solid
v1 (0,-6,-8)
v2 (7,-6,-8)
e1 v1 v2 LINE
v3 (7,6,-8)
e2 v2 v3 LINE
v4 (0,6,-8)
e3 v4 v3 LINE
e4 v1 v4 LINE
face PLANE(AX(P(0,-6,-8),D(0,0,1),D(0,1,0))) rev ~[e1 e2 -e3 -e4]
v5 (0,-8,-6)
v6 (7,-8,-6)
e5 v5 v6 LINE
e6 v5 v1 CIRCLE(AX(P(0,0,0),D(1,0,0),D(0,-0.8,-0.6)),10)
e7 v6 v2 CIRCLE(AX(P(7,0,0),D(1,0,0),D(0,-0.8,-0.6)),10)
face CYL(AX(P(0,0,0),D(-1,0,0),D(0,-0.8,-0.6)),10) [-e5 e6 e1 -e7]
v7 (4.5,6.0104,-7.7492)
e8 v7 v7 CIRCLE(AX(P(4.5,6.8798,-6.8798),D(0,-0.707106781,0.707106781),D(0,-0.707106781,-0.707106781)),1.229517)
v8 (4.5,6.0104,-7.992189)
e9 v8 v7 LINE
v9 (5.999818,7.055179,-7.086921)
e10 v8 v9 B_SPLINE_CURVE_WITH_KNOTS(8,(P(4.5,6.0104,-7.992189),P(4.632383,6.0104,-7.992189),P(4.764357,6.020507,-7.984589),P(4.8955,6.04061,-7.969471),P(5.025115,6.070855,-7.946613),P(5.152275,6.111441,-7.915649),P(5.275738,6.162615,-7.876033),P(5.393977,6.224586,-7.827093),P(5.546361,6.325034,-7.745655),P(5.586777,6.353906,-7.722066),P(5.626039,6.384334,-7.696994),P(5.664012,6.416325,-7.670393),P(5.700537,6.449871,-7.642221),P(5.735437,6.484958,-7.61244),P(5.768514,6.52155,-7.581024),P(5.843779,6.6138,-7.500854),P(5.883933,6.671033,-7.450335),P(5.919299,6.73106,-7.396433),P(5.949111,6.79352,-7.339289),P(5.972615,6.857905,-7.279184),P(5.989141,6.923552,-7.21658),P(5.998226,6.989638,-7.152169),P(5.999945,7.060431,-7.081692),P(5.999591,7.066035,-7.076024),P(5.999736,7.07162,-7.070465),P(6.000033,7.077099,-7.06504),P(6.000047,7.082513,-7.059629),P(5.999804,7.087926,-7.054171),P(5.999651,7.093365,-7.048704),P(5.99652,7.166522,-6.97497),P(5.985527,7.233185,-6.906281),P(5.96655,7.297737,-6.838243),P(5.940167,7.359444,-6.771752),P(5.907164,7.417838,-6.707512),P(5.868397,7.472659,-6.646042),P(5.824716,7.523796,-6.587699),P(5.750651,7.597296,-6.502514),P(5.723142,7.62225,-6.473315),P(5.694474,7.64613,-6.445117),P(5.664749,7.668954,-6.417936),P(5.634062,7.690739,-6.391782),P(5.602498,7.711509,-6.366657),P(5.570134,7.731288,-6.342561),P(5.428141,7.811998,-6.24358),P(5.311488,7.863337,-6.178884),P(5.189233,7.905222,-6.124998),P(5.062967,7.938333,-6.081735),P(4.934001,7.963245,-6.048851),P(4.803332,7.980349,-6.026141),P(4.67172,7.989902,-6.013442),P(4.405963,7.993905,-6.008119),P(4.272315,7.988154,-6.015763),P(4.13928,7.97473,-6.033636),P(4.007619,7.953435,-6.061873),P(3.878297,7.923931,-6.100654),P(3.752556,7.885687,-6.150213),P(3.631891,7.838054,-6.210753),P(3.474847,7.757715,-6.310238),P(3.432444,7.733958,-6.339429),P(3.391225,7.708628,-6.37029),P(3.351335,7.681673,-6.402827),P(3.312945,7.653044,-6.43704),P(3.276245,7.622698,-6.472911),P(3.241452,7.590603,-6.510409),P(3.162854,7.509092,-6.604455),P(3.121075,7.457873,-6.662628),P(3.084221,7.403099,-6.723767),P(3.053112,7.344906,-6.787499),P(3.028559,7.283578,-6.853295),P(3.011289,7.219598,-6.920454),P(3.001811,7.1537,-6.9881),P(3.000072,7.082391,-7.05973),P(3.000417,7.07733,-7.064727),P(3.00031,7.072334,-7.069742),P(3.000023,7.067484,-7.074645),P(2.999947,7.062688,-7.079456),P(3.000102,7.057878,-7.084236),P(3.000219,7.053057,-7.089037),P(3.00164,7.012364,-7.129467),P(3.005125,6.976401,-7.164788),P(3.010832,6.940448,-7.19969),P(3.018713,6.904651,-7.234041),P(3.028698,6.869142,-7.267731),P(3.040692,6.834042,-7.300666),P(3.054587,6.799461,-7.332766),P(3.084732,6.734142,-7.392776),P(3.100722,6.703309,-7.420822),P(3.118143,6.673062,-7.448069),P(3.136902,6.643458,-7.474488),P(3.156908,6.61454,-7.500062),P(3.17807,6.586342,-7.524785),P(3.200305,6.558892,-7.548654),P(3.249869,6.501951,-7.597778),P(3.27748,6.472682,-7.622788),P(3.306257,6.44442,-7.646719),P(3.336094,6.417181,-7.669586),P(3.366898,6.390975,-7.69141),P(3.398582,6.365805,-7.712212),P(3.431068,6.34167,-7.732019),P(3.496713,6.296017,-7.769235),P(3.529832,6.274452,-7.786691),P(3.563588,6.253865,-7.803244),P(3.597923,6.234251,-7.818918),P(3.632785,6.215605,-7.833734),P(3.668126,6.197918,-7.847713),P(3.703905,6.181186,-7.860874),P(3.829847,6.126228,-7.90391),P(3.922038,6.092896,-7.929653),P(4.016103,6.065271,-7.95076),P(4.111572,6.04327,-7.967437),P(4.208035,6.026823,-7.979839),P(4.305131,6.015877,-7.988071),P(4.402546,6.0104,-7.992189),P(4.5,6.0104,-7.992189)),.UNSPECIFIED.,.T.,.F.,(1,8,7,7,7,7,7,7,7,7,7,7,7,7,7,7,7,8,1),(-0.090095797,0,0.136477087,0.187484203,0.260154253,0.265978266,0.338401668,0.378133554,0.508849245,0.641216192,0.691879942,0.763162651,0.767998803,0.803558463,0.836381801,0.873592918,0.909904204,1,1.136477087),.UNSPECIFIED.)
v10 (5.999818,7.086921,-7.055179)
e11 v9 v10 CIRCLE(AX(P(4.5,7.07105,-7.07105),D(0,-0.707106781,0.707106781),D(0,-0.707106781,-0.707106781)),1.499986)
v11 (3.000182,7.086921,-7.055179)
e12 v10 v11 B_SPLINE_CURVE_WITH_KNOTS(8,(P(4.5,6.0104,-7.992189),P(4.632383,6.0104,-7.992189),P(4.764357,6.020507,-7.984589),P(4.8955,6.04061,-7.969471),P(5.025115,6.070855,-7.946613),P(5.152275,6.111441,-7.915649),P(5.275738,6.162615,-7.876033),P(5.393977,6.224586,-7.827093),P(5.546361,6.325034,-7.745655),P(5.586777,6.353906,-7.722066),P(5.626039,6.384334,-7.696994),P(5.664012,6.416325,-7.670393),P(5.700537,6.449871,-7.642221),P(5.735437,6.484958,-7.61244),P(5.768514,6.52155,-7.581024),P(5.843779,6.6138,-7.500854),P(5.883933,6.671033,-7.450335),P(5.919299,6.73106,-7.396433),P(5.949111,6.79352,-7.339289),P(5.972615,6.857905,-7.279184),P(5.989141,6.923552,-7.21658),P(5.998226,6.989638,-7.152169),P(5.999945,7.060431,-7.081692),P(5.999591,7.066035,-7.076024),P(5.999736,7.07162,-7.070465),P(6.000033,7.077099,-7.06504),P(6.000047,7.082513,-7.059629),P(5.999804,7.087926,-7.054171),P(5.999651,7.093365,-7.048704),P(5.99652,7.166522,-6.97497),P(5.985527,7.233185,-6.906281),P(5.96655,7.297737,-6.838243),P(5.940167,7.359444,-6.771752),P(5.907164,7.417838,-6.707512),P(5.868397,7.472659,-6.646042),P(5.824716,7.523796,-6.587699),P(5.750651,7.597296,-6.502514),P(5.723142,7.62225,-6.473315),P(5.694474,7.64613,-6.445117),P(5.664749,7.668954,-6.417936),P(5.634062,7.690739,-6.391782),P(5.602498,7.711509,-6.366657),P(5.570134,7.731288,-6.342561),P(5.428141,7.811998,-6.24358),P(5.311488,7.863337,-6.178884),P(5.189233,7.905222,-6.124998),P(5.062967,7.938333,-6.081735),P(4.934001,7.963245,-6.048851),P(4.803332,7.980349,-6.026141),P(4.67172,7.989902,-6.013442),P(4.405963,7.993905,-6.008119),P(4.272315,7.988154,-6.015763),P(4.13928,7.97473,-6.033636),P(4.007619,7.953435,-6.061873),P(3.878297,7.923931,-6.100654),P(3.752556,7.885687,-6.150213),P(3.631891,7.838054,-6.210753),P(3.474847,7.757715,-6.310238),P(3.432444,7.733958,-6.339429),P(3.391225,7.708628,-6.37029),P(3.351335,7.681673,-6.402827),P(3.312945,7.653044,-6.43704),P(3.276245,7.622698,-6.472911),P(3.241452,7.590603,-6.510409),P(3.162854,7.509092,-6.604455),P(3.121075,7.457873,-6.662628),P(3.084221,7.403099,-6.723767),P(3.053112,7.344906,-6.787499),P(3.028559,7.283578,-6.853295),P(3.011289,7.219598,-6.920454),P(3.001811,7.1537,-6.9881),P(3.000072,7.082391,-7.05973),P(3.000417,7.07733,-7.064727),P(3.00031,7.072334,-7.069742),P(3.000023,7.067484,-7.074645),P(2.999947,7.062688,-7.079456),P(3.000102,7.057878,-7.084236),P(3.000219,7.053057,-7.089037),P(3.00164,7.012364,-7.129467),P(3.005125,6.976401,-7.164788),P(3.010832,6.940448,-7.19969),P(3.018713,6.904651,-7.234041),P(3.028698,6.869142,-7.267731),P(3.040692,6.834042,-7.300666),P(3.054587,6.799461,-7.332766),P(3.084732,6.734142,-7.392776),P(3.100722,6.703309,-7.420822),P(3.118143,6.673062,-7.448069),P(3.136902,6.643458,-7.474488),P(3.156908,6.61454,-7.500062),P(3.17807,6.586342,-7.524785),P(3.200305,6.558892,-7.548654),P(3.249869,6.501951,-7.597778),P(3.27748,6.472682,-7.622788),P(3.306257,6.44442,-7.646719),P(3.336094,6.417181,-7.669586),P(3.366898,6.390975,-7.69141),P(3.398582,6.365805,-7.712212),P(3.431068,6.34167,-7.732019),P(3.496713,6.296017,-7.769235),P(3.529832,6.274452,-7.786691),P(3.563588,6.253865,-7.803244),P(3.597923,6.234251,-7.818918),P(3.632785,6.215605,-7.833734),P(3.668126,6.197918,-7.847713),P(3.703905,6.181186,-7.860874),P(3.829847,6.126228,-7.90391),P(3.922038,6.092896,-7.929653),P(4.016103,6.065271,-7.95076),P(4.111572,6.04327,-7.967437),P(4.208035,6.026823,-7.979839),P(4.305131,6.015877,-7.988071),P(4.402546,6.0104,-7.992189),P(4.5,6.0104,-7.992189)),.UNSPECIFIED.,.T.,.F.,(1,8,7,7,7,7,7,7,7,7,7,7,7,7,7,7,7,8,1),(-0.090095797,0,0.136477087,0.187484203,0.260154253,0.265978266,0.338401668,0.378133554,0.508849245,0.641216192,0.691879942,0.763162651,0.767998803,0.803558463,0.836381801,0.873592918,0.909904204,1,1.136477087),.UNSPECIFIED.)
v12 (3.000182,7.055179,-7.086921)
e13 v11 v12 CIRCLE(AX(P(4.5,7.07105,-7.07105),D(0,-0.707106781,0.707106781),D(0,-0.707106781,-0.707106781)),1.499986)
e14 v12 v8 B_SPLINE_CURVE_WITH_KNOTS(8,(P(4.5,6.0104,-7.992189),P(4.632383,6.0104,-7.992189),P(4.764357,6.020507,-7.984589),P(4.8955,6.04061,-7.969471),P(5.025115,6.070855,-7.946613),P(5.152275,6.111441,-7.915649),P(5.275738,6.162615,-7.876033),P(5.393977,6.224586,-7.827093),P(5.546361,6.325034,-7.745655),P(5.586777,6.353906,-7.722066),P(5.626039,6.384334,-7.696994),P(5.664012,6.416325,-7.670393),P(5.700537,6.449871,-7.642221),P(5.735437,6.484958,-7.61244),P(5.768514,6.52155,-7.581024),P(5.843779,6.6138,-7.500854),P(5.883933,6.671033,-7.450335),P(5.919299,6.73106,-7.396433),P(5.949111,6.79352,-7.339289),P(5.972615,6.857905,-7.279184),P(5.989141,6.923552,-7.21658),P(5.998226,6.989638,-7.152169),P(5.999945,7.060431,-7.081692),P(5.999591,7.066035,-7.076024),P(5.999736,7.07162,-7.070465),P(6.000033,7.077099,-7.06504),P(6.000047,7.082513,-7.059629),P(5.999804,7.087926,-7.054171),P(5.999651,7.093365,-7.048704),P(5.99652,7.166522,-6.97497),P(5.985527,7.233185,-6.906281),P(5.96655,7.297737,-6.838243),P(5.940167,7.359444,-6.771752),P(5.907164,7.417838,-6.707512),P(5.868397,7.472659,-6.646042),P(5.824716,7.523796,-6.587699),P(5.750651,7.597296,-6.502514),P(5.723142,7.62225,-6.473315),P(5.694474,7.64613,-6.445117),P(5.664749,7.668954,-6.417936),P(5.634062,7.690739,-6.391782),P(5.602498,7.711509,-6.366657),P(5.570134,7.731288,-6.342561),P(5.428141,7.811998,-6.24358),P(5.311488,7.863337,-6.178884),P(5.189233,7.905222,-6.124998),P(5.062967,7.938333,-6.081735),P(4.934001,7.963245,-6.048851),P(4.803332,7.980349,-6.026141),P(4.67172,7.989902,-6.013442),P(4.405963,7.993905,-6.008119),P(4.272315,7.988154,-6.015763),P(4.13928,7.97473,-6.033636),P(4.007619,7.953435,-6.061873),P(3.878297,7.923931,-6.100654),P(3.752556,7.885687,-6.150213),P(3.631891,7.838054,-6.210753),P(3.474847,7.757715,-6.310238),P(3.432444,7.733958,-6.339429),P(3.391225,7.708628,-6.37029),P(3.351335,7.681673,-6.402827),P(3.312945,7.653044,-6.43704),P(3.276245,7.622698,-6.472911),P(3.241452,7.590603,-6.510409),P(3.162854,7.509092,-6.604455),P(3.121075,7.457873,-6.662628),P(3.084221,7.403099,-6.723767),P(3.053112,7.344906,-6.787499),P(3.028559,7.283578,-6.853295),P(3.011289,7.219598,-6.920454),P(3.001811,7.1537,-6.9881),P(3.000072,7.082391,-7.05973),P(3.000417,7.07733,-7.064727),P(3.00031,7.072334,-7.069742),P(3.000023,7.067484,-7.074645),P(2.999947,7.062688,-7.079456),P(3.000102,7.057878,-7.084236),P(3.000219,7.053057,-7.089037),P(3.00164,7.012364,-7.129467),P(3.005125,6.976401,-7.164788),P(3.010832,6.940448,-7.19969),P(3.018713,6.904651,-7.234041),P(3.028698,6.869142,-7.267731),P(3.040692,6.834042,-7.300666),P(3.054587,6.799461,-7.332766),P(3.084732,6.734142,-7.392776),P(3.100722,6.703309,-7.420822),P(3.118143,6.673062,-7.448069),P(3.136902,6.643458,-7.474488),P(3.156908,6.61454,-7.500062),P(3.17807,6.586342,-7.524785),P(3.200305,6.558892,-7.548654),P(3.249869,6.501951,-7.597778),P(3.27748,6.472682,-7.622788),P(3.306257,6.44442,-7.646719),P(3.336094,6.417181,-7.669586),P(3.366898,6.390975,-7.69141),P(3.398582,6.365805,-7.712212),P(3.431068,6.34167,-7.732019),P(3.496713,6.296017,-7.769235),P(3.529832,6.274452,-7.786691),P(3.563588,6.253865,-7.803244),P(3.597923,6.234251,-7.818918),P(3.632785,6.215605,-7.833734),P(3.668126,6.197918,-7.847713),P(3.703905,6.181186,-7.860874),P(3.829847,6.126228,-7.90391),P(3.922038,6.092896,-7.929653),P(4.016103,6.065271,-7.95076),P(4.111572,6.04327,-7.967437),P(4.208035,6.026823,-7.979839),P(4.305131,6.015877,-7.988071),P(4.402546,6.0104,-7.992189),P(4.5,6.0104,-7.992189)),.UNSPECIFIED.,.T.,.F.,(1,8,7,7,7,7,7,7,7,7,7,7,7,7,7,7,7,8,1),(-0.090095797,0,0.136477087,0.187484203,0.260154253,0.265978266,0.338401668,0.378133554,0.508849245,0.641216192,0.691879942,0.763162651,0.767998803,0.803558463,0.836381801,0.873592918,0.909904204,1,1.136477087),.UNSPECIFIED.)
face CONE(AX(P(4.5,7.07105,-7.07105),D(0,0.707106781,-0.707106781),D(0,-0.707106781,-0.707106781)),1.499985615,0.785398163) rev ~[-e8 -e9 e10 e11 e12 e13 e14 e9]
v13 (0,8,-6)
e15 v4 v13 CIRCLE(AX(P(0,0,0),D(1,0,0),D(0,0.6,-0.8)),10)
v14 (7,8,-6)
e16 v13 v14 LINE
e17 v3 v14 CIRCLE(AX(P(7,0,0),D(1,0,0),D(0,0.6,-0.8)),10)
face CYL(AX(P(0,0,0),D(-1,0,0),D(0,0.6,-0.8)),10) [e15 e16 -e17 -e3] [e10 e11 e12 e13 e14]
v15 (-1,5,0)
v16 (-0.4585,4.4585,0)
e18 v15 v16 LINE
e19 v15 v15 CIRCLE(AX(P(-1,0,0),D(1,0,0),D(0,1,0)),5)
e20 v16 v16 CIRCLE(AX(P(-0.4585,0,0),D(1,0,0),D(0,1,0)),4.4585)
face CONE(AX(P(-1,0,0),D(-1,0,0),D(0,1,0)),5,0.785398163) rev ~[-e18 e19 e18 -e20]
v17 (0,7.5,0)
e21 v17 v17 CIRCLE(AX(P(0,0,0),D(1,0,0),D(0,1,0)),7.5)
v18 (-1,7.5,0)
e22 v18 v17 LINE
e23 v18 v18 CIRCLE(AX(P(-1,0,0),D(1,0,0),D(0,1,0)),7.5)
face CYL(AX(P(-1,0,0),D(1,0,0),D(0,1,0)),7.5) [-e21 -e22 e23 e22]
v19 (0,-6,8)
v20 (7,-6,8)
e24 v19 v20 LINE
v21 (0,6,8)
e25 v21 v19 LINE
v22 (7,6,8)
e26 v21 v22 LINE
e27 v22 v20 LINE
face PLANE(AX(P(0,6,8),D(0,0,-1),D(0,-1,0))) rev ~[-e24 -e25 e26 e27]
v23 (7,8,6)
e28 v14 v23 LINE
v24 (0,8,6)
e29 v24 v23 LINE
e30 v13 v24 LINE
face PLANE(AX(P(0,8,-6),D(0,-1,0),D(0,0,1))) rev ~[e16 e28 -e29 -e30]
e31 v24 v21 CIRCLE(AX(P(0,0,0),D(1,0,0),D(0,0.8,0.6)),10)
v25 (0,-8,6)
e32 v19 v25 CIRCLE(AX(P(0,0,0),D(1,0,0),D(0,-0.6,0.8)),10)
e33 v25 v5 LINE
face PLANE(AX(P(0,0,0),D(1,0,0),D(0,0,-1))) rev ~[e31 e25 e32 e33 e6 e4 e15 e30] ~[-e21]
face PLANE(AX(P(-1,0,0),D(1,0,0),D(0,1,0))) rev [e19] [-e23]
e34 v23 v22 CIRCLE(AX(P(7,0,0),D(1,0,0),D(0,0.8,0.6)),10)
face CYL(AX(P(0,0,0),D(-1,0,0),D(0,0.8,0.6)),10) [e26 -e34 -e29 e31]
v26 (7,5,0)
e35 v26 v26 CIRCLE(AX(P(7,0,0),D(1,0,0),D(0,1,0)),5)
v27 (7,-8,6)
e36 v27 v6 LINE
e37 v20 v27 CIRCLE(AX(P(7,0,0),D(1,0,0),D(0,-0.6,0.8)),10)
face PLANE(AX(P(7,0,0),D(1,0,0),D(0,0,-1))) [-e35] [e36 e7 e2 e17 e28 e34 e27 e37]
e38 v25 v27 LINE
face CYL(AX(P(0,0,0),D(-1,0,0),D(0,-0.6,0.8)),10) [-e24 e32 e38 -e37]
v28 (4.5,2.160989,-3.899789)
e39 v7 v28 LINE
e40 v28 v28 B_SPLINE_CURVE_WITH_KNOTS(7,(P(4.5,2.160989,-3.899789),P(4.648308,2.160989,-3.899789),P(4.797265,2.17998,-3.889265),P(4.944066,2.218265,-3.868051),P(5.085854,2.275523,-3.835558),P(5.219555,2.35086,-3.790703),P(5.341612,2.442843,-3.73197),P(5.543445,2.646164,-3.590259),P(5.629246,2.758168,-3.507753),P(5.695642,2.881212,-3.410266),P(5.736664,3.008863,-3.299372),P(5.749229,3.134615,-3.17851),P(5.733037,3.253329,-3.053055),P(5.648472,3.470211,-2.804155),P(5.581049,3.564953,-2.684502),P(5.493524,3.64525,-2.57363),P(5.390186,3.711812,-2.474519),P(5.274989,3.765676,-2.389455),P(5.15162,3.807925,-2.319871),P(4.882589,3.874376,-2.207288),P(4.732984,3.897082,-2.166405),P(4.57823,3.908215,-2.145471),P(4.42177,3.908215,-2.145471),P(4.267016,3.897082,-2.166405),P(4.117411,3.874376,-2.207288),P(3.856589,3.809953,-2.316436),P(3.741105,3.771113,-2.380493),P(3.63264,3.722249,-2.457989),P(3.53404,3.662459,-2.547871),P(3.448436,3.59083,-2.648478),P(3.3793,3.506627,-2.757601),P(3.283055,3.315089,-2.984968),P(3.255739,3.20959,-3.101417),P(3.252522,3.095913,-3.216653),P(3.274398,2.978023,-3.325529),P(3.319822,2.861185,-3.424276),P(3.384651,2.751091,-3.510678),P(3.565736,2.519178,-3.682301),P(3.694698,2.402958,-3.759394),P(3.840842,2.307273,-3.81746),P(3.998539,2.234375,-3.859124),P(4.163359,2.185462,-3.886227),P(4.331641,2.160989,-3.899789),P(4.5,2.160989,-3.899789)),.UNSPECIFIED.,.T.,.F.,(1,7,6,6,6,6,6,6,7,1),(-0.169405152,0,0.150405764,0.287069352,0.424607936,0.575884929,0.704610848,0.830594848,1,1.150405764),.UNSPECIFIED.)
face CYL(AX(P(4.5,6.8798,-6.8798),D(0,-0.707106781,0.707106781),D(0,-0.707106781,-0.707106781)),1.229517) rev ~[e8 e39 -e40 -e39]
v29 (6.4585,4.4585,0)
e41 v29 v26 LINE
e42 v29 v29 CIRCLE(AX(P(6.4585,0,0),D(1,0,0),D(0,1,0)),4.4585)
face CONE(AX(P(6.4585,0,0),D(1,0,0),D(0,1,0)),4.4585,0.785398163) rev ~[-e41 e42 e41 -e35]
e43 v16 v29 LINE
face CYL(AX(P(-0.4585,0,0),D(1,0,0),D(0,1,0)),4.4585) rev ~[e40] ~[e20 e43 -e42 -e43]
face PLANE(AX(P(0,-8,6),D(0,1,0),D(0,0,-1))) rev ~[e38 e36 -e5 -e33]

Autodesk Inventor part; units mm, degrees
sketch "Sketch_1" plane through (0, 0, 0) normal (1, 0, 0) x (0, 0, -1)
  line L0 (-8, 6) -> (-8, -6)
  arc A0 (-8, -6) -> (-6, -8) centre (0, 0) ccw
  line L1 (-6, -8) -> (6, -8)
  arc A1 (6, -8) -> (8, -6) centre (0, 0) ccw
  line L2 (8, -6) -> (8, 6)
  arc A2 (8, 6) -> (6, 8) centre (0, 0) ccw
  line L3 (6, 8) -> (-6, 8)
  arc A3 (-6, 8) -> (-8, 6) centre (0, 0) ccw
extrude "Extrusion1" add sketch "Sketch_1" along normal blind 7
sketch "Sketch_2" plane through (0, 0, 0) normal (0, 0, 1) x (1, 0, 0)
  line L0 (0, 0) -> (-1, 0)
  line L1 (-1, 0) -> (-1, 7.5)
  line L2 (-1, 7.5) -> (0, 7.5)
  line L3 (0, 7.5) -> (0, 0)
  line L4 (0, 0) -> (-1, 0)
revolve "Revolution1" add sketch "Sketch_2" angle 360 about axis through (0, 0, 0) along (1, 0, 0)
sketch "Sketch_3" plane through (0, 0, 0) normal (0, 0, 1) x (1, 0, 0)
  line L0 (7, 0) -> (-1, 0)
  line L1 (-1, 0) -> (-1, 5)
  line L2 (-1, 5) -> (-0.4585, 4.4585)
  line L3 (-0.4585, 4.4585) -> (6.4585, 4.4585)
  line L4 (6.4585, 4.4585) -> (7, 5)
  line L5 (7, 5) -> (7, 0)
  line L6 (7, 0) -> (-1, 0)
revolve "Revolution2" cut sketch "Sketch_3" angle 360 about axis through (7, 0, 0) along (1, 0, 0)
thread "Thread1" size "M10x1" class "6H" standard "ISO Metric profile" full length
sketch "Sketch_4" plane through (4.5, 0, 0) normal (1, 0, 0) x (0, 0, -1)
  line L0 (0, 0) -> (7.0711, 7.0711)
  line L1 (7.0711, 7.0711) -> (8.1317, 6.0104)
  line L2 (8.1317, 6.0104) -> (7.7492, 6.0104)
  line L3 (7.7492, 6.0104) -> (0.8694, -0.8694)
  line L4 (0.8694, -0.8694) -> (0, 0)
  line L5 (0, 0) -> (7.0711, 7.0711)
revolve "Revolution3" cut sketch "Sketch_4" angle 360 about axis through (4.5, 0, 0) along (0, -0.7071068, 0.7071068)
thread "Thread2" size "M3x0.5" class "6H" standard "ISO Metric profile" full length
ref_plane "to_collar_XY" through (-1, 0, 0) normal (-1, 0, 0) x (0, -0.7071068, -0.7071068)
ref_plane "to_collar_YZ" through (-1, 0, 0) normal (0, -0.7071068, -0.7071068) x (0, -0.7071068, 0.7071068)
ref_plane "to_collar_ZX" through (-1, 0, 0) normal (0, -0.7071068, 0.7071068) x (-1, 0, 0)
properties part number "C-TFK10_n"
